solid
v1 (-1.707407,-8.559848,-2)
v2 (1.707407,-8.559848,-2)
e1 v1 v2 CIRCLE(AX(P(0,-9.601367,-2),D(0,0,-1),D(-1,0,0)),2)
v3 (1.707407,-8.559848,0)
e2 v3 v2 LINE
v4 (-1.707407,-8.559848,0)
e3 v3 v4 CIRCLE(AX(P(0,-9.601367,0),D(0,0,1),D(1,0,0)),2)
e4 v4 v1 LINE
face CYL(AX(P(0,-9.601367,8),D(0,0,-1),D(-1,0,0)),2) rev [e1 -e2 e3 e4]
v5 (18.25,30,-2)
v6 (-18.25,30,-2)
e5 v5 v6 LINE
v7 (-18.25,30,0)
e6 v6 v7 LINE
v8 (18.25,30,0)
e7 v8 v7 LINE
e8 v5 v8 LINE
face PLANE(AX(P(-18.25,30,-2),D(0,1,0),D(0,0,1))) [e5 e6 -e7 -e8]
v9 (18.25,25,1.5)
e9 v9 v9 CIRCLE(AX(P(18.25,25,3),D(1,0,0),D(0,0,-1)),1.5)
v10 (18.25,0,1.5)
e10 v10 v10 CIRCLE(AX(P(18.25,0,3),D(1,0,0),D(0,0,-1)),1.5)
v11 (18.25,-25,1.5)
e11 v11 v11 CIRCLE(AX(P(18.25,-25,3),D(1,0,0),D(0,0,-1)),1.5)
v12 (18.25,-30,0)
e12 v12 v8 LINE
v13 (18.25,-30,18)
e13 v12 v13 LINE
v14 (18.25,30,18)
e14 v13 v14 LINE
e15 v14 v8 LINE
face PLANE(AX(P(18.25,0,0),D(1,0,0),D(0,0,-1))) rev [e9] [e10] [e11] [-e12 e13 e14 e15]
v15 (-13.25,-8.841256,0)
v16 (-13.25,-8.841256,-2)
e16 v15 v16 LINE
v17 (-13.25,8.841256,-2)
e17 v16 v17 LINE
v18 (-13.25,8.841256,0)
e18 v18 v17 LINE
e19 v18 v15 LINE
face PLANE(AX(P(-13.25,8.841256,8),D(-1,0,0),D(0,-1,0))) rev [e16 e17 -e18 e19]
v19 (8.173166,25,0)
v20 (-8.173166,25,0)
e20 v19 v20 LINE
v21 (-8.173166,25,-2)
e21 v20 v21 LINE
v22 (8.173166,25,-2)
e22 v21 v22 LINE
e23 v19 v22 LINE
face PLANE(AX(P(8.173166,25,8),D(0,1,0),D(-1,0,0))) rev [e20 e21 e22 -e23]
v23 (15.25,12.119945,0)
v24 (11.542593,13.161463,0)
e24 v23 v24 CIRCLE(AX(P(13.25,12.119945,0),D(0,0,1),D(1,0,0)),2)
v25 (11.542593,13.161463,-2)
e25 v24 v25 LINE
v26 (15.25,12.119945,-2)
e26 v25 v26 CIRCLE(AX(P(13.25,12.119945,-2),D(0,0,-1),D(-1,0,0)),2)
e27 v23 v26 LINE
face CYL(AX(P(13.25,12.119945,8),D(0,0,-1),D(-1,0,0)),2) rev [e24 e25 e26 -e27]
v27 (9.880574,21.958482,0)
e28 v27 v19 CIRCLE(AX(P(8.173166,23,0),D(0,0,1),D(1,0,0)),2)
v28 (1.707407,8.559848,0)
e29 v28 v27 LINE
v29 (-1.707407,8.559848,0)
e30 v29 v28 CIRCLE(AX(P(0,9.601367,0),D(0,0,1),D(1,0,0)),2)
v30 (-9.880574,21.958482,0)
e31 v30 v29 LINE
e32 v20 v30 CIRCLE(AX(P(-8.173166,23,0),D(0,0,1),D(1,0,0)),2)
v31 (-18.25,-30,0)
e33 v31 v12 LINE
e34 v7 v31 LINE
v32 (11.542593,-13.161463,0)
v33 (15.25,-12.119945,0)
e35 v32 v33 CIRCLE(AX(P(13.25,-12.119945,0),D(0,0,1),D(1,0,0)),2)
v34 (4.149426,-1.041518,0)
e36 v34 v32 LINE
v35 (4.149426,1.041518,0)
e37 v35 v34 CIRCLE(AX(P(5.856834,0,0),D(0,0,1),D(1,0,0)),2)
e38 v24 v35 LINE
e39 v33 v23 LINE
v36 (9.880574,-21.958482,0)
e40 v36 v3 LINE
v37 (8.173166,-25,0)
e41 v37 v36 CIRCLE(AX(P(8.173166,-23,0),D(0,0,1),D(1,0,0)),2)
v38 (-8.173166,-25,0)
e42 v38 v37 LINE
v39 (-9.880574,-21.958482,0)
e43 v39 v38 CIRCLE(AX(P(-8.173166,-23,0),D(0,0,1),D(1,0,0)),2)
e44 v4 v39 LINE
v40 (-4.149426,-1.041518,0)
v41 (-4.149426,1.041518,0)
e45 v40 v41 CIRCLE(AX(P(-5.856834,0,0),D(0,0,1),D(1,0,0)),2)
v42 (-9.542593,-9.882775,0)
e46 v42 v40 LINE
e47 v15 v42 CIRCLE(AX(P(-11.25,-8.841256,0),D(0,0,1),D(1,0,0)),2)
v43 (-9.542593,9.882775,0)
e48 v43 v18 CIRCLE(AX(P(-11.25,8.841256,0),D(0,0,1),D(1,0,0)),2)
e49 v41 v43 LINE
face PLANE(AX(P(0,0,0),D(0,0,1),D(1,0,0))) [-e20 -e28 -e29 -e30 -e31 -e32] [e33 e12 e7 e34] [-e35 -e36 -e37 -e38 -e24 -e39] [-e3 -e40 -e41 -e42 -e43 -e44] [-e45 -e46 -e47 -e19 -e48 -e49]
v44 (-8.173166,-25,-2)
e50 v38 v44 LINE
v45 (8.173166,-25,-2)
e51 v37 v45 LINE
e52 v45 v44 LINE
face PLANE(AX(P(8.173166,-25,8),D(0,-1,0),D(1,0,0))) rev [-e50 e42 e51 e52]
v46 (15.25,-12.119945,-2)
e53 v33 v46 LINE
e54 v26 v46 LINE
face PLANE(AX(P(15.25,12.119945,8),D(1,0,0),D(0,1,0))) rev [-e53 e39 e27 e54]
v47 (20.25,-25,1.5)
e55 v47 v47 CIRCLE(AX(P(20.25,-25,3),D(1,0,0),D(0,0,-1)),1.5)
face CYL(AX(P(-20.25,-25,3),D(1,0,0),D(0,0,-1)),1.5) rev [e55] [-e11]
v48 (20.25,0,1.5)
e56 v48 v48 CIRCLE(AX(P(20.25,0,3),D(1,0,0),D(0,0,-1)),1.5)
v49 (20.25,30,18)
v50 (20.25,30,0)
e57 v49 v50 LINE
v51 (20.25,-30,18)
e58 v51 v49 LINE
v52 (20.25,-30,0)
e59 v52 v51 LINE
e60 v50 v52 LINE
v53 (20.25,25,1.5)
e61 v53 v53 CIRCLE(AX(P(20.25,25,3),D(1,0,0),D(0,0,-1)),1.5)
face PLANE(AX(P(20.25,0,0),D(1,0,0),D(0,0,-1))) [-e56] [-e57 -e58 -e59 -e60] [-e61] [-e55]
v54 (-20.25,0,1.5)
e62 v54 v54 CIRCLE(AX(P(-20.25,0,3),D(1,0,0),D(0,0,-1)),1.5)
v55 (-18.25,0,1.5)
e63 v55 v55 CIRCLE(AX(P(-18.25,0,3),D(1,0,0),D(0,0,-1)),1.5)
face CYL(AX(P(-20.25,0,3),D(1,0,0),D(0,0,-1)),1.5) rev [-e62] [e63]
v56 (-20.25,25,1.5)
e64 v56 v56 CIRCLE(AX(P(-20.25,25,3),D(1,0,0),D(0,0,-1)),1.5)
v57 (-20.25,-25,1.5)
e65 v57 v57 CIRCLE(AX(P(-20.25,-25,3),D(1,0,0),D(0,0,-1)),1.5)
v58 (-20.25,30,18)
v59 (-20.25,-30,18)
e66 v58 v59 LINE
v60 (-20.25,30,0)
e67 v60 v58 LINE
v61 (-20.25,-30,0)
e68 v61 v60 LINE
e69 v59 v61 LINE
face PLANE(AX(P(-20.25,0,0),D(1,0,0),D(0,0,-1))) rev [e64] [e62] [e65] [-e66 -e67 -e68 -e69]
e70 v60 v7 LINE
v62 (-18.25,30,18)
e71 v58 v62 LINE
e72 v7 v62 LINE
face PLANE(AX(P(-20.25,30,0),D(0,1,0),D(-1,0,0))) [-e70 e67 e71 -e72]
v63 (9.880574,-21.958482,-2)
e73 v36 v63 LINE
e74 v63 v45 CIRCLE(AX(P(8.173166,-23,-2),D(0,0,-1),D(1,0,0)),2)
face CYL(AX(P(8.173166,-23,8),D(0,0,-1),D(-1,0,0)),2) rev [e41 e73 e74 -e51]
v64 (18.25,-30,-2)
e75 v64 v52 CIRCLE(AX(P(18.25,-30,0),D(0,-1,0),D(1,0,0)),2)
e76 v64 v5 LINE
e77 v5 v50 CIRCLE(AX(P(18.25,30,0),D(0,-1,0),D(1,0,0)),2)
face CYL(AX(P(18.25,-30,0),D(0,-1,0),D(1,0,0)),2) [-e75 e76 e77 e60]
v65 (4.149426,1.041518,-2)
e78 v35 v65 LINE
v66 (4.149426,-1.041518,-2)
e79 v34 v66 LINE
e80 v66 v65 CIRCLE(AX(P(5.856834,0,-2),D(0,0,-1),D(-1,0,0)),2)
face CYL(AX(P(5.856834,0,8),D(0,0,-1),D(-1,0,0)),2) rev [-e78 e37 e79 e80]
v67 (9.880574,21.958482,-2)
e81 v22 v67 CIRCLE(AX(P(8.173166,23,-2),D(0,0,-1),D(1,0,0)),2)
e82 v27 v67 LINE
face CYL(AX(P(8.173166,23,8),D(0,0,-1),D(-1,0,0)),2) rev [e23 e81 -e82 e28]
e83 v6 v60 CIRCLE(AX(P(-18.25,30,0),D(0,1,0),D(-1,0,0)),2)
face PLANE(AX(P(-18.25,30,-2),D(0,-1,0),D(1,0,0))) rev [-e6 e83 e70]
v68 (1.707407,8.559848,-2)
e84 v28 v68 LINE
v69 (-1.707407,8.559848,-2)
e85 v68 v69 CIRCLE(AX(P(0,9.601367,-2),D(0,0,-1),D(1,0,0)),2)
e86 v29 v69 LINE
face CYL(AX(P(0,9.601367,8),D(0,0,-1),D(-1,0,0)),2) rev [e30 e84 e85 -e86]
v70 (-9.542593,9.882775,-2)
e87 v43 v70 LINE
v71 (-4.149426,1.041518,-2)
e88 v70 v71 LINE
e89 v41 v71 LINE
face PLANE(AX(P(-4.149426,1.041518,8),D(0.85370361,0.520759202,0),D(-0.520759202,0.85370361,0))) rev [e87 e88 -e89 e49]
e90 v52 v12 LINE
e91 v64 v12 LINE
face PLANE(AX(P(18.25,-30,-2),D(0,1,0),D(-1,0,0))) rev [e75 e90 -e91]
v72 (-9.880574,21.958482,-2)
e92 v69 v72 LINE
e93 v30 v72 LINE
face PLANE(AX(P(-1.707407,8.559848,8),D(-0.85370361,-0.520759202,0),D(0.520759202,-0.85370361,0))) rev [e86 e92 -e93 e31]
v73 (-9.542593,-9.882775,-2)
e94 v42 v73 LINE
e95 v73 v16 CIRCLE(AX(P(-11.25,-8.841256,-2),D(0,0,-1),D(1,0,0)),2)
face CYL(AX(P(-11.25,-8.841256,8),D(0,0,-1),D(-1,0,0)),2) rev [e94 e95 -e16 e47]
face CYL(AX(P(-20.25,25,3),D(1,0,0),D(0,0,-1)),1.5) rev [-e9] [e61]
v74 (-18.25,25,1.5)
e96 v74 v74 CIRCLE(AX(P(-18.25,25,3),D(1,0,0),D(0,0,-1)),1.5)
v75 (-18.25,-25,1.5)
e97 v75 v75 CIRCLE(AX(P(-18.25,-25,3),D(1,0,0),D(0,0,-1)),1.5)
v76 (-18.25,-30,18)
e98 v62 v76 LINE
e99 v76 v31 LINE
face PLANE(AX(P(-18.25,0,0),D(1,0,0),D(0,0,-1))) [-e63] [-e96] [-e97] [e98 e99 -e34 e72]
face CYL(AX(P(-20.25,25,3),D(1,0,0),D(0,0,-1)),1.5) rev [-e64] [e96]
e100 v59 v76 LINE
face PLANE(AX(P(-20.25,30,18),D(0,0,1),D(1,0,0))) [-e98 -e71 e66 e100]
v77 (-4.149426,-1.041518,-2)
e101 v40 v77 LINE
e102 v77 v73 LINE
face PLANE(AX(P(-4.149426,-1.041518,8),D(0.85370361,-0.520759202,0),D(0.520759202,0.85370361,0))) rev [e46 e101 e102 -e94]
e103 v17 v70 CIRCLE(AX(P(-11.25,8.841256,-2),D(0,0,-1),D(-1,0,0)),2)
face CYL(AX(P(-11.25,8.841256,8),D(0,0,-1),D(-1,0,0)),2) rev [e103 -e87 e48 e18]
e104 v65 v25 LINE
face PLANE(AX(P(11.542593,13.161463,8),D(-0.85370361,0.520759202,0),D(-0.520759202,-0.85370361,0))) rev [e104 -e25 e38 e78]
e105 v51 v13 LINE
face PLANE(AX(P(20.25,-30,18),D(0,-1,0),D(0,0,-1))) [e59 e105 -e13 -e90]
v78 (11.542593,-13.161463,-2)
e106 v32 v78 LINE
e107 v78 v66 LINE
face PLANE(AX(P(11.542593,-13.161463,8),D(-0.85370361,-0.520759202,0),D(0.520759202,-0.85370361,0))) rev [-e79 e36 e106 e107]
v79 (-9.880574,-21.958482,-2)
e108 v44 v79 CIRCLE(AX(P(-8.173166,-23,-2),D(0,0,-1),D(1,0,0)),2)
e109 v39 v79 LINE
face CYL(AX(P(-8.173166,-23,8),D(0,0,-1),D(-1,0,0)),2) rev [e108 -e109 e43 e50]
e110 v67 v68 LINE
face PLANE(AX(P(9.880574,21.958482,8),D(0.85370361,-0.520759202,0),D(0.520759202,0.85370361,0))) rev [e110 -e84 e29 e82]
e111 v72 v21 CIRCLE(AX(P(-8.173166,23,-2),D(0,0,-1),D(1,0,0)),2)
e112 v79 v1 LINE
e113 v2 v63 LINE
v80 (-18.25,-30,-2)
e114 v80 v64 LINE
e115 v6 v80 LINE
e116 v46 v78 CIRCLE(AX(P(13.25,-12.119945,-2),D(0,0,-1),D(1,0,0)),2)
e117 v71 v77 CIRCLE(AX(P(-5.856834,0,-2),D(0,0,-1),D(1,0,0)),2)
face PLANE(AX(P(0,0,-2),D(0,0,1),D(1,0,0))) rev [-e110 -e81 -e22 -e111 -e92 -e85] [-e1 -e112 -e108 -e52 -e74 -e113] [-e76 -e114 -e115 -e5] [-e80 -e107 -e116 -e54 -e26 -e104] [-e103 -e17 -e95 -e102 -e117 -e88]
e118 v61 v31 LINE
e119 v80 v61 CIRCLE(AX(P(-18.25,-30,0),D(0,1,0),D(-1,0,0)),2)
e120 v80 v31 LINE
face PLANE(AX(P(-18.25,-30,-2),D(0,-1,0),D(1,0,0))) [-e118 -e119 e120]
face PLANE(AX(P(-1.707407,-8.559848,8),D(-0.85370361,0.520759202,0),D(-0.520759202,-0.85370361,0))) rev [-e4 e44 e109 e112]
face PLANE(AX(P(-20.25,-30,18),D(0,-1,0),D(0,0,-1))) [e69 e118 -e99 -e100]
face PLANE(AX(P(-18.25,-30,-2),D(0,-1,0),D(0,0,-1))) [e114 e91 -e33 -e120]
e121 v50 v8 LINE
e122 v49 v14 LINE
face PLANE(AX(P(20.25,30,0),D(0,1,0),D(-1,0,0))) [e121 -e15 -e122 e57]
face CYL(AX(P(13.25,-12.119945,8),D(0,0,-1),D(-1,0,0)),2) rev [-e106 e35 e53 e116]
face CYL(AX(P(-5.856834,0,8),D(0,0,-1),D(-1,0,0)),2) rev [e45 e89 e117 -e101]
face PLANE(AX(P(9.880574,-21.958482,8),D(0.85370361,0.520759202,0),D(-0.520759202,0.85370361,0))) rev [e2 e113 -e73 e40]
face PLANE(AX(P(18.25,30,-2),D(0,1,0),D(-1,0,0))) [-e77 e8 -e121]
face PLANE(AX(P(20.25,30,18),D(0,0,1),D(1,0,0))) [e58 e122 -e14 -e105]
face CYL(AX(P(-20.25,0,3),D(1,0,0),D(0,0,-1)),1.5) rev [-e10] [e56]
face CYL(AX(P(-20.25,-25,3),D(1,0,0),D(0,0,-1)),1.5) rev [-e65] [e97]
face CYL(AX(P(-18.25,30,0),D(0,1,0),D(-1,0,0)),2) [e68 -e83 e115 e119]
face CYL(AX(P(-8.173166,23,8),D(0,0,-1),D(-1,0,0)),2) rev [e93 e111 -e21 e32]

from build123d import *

# Parameters (mm, degrees)
SKETCH_1_W             = 36.5
SKETCH_1_H             = 60
SM_BASE_FLANGE_1_DEPTH = 2
SM_START               = -30
SM_EDGE_FLANGE_1_DEPTH = 60
CUT_EXTRUDE_1_DEPTH    = 10
SKETCH_17_R            = 1.5
CUT_EXTRUDE_2_DEPTH    = 54.518688325


# Read off the part's stored shape, not the designer's step: 邊線-凸緣1
# Sheet-metal steps are written as plain solids
with BuildPart() as part:
    # Sketch 1 → 基材-凸緣1 (new body)
    with BuildSketch(Plane.XY):
        Rectangle(SKETCH_1_W, SKETCH_1_H)
    extrude(amount=-SM_BASE_FLANGE_1_DEPTH)

    # 邊線-凸緣1 outline → 邊線-凸緣1 (add)
    with BuildSketch(Plane(origin=(0, 0, 0), x_dir=(1, 0, 0), z_dir=(0, 1, 0)).offset(SM_START)):
        with BuildLine():
            ThreePointArc((20.25, 0), (19.664213562, 1.414213562), (18.25, 2))
            Line((18.25, 2), (18.25, -18))
            Line((18.25, -18), (20.25, -18))
            Line((20.25, -18), (20.25, 0))
        make_face()
        with BuildLine():
            Line((-20.25, 0), (-20.25, -18))
            Line((-20.25, -18), (-18.25, -18))
            Line((-18.25, -18), (-18.25, 2))
            ThreePointArc((-18.25, 2), (-19.664213562, 1.414213562), (-20.25, 0))
        make_face()
    extrude(amount=SM_EDGE_FLANGE_1_DEPTH)

    # 草圖14 → 除料-伸長1 (cut)
    with BuildSketch(Plane(origin=(0, 0, -2), x_dir=(-1, 0, 0), z_dir=(0, 0, -1))):
        with BuildLine():
            Line((-8.173166384, 25), (8.173166384, 25))
            ThreePointArc((8.173166384, 25), (9.91716134, 23.979020733), (9.880573604, 21.958481596))
            Line((9.880573604, 21.958481596), (1.70740722, 8.559848179))
            ThreePointArc((1.70740722, 8.559848179), (0, 7.601366583), (-1.70740722, 8.559848179))
            Line((-1.70740722, 8.559848179), (-9.880573604, 21.958481596))
            ThreePointArc((-9.880573604, 21.958481596), (-9.91716134, 23.979020733), (-8.173166384, 25))
        make_face()
        with BuildLine():
            Line((-15.25, 12.119944893), (-15.25, -12.119944893))
            ThreePointArc((-15.25, -12.119944893), (-13.79091846, -14.045407751), (-11.54259278, -13.161463297))
            Line((-11.54259278, -13.161463297), (-4.149426396, -1.041518404))
            ThreePointArc((-4.149426396, -1.041518404), (-3.856833616, 0), (-4.149426396, 1.041518404))
            Line((-4.149426396, 1.041518404), (-11.54259278, 13.161463297))
            ThreePointArc((-11.54259278, 13.161463297), (-13.79091846, 14.045407751), (-15.25, 12.119944893))
        make_face()
        with BuildLine():
            Line((-8.173166384, -25), (8.173166384, -25))
            ThreePointArc((8.173166384, -25), (9.91716134, -23.979020733), (9.880573604, -21.958481596))
            Line((9.880573604, -21.958481596), (1.70740722, -8.559848179))
            ThreePointArc((1.70740722, -8.559848179), (0, -7.601366583), (-1.70740722, -8.559848179))
            Line((-1.70740722, -8.559848179), (-9.880573604, -21.958481596))
            ThreePointArc((-9.880573604, -21.958481596), (-9.91716134, -23.979020733), (-8.173166384, -25))
        make_face()
        with BuildLine():
            Line((13.25, 8.841256368), (13.25, -8.841256368))
            ThreePointArc((13.25, -8.841256368), (11.79091846, -10.766719227), (9.54259278, -9.882774772))
            Line((9.54259278, -9.882774772), (4.149426396, -1.041518404))
            ThreePointArc((4.149426396, -1.041518404), (3.856833616, 0), (4.149426396, 1.041518404))
            Line((4.149426396, 1.041518404), (9.54259278, 9.882774772))
            ThreePointArc((9.54259278, 9.882774772), (11.79091846, 10.766719227), (13.25, 8.841256368))
        make_face()
    extrude(amount=-CUT_EXTRUDE_1_DEPTH, mode=Mode.SUBTRACT)

    # 草圖17 → 除料-伸長2 (cut, through all)
    with BuildSketch(Plane(origin=(20.25, 0, 0), x_dir=(0, 0, -1), z_dir=(1, 0, 0))):
        with Locations((-3, 25)):
            Circle(SKETCH_17_R)
        with Locations((-3, -25)):
            Circle(SKETCH_17_R)
        with Locations((-3, 0)):
            Circle(SKETCH_17_R)
    extrude(amount=-CUT_EXTRUDE_2_DEPTH, mode=Mode.SUBTRACT)


solid = part.part
